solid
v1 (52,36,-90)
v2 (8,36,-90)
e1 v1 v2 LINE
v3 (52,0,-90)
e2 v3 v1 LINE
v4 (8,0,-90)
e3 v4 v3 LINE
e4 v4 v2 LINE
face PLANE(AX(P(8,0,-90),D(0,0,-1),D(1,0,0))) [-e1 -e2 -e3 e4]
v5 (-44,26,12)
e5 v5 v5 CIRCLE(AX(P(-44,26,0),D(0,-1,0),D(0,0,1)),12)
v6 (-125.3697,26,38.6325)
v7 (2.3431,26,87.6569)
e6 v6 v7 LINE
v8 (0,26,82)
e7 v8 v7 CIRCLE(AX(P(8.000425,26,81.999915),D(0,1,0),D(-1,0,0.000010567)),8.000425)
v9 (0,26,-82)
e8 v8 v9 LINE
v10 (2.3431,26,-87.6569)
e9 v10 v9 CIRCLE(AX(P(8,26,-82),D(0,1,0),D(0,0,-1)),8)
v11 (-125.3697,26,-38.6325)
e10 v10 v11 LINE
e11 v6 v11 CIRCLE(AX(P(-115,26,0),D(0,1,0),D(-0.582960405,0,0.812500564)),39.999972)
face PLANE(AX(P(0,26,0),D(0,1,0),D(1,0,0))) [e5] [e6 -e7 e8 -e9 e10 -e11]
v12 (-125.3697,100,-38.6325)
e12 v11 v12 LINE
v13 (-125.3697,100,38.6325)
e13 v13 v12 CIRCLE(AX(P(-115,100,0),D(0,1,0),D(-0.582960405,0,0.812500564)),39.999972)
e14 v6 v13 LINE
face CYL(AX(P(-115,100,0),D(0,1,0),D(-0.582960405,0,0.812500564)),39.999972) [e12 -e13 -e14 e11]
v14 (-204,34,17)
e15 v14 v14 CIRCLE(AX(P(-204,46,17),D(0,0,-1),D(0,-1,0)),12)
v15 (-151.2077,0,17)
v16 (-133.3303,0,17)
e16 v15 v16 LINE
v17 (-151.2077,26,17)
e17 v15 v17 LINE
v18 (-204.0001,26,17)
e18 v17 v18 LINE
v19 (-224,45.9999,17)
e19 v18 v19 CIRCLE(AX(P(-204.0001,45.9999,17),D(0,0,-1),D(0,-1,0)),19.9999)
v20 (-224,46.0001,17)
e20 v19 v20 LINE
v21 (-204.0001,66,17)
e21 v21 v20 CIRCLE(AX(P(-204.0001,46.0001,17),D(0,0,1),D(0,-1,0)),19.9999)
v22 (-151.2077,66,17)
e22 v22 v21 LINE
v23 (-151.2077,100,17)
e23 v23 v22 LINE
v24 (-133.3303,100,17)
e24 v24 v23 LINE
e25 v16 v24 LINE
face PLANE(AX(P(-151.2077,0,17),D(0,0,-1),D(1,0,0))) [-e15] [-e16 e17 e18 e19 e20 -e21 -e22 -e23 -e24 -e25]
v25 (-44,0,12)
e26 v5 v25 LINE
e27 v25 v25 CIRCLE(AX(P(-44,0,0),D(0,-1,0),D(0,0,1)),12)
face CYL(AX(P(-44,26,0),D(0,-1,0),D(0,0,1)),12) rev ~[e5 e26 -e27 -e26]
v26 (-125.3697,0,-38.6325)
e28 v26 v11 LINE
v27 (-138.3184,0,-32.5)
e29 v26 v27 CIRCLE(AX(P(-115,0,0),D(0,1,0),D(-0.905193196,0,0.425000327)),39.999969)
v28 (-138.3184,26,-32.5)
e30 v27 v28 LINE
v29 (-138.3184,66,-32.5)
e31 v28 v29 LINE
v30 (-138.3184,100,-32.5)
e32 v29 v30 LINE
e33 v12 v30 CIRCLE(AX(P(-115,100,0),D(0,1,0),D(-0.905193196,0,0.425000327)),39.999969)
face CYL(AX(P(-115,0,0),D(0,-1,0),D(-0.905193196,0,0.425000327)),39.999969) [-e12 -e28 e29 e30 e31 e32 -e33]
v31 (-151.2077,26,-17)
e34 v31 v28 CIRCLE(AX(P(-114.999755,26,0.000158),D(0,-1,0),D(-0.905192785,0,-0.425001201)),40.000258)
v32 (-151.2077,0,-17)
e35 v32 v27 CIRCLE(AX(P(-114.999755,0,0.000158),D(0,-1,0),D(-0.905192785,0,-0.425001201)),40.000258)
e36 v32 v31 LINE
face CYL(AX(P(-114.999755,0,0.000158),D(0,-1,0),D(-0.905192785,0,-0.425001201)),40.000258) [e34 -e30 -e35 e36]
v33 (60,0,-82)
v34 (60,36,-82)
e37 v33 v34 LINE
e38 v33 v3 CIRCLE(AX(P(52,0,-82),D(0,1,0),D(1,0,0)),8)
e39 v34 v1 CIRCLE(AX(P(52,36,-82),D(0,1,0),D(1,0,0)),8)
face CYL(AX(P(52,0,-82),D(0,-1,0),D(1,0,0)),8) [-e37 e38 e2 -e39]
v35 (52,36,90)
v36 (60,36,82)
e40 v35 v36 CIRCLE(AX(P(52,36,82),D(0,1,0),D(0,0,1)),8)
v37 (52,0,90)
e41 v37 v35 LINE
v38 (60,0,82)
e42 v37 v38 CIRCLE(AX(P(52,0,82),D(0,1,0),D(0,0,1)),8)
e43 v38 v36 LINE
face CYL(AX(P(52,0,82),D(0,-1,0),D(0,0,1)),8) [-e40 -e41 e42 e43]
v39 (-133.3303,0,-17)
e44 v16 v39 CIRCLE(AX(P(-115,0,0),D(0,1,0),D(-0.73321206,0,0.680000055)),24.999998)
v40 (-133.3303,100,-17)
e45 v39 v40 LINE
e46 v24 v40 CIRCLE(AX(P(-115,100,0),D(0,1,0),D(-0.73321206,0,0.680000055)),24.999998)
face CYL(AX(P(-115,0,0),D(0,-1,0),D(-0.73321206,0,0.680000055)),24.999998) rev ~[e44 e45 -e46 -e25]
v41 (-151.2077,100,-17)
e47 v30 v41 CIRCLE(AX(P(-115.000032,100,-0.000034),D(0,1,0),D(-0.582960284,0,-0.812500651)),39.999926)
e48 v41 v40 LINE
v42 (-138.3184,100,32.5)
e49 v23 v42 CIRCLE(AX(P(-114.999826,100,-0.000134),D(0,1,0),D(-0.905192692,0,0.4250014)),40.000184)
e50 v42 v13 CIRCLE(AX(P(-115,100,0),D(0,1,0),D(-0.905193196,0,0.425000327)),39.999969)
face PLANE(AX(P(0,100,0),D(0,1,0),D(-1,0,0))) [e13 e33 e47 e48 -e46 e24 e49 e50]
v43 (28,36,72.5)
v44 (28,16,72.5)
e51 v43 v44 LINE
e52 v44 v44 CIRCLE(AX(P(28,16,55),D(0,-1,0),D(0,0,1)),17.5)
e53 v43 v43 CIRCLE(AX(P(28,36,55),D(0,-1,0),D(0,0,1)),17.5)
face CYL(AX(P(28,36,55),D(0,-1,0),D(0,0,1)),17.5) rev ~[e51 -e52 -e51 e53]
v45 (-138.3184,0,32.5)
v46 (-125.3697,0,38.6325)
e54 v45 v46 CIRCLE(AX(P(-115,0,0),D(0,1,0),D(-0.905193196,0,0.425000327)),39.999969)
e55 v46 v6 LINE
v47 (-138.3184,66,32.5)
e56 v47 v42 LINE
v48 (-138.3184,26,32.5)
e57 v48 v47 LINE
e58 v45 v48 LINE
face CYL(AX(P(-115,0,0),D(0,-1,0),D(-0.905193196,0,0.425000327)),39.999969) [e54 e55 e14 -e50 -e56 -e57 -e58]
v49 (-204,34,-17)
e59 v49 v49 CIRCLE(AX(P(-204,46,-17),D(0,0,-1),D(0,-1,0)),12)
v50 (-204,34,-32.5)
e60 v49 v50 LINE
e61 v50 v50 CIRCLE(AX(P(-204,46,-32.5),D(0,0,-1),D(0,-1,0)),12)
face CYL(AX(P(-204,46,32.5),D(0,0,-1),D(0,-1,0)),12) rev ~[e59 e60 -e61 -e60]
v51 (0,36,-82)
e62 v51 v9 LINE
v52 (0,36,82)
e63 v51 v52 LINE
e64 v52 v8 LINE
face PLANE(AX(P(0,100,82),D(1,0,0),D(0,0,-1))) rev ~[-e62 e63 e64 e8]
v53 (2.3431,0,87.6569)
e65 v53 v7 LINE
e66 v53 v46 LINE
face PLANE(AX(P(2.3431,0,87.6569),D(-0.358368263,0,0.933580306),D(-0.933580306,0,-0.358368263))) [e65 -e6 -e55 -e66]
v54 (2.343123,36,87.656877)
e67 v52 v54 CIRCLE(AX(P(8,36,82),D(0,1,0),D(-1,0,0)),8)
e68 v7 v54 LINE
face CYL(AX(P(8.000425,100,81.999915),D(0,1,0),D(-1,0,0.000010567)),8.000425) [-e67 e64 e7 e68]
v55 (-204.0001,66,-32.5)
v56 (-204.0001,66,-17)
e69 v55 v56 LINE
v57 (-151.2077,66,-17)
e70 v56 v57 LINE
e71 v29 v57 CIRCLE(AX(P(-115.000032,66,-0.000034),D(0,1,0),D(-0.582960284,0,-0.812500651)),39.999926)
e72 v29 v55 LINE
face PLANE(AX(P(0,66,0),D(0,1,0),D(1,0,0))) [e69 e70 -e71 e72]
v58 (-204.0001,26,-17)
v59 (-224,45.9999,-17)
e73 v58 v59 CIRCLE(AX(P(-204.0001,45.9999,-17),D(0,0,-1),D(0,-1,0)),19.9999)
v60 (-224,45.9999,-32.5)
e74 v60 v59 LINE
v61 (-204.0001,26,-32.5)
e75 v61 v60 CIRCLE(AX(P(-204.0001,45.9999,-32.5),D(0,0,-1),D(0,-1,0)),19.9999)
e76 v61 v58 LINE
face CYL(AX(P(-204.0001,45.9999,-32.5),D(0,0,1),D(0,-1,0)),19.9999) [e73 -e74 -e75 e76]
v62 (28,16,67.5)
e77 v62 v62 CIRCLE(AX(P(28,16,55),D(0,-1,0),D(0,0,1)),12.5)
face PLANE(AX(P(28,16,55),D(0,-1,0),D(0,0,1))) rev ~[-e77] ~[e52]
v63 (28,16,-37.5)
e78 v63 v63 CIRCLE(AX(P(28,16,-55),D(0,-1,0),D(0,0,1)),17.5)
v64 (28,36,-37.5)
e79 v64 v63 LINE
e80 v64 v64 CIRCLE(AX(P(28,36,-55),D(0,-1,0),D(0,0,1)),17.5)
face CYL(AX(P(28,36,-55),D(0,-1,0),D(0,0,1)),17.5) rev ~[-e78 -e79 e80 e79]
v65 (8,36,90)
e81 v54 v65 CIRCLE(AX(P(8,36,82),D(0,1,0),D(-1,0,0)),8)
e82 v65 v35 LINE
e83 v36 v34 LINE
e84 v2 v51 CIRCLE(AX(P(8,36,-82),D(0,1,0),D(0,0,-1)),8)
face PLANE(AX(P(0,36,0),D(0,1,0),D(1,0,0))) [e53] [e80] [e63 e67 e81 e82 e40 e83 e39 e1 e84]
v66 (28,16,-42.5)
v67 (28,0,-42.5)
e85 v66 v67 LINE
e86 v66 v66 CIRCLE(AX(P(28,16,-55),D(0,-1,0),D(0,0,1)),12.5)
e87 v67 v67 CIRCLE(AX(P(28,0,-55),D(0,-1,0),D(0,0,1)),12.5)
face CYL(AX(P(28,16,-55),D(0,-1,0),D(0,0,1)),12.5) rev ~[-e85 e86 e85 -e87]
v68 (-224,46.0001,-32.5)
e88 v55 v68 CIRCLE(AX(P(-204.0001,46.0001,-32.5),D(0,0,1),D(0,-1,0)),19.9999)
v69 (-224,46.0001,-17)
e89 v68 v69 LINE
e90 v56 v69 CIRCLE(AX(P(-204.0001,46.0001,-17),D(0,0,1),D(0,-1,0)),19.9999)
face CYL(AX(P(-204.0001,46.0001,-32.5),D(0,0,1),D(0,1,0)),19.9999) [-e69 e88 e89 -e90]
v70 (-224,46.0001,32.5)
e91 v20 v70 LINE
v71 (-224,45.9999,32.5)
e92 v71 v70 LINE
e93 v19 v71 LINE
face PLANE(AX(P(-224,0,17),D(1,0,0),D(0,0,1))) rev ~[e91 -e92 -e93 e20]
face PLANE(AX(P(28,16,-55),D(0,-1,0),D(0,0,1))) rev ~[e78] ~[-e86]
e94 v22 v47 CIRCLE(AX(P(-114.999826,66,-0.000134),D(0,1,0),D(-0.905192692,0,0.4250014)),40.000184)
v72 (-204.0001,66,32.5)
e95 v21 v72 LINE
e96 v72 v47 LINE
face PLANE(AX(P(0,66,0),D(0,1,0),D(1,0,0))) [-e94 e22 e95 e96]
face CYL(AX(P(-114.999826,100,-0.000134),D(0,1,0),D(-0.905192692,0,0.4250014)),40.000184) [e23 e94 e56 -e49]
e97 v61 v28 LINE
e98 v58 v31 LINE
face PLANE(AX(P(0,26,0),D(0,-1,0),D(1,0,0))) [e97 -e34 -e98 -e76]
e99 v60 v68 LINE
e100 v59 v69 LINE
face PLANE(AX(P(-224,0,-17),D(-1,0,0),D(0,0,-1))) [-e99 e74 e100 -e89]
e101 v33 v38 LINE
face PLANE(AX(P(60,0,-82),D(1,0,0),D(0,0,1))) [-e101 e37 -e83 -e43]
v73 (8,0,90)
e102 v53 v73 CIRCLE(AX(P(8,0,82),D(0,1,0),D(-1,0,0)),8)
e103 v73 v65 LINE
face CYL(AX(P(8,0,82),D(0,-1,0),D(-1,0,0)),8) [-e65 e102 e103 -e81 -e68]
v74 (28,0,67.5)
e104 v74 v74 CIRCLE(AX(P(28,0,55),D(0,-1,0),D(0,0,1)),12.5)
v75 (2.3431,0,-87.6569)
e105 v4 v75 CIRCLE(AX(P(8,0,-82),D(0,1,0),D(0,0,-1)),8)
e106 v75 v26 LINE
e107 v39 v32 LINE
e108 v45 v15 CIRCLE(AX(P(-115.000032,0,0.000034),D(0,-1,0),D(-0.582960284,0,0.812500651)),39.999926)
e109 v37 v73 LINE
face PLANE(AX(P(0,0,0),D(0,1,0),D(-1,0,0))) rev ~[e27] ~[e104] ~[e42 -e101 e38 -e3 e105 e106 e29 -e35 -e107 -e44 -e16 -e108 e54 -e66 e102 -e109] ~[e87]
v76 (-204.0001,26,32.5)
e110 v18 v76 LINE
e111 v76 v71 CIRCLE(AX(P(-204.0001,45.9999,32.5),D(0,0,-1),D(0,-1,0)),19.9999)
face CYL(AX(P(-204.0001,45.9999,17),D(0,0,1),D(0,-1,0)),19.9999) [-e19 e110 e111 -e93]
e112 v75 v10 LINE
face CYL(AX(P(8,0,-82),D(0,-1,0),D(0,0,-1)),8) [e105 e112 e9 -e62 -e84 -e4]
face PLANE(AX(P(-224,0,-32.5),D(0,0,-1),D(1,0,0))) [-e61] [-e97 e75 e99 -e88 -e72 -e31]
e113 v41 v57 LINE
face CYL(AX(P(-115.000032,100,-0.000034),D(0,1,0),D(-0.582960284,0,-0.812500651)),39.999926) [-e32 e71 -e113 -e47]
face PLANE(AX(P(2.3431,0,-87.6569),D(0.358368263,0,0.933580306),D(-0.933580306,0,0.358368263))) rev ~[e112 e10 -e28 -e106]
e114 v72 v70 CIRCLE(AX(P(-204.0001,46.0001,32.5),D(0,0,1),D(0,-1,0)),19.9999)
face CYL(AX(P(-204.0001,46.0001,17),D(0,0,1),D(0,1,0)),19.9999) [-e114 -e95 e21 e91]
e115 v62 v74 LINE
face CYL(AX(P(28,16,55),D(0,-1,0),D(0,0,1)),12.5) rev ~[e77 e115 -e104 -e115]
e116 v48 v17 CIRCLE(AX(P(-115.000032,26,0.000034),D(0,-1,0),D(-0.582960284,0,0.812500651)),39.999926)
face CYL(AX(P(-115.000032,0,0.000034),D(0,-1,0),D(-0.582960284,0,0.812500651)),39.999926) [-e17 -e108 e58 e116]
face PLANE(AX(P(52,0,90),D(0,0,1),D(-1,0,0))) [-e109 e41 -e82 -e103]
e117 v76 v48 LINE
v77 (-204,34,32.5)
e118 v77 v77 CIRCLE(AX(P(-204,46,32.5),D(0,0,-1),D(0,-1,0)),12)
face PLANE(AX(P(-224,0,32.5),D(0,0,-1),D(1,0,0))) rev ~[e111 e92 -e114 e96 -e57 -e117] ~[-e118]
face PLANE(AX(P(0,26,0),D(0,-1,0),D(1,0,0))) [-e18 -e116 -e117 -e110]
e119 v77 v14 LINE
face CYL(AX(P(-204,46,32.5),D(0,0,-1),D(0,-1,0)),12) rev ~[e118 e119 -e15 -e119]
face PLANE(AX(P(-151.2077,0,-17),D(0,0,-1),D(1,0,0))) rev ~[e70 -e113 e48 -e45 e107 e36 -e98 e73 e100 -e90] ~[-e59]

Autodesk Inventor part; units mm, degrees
ref_plane "YZ Plane" through (0, 0, 0) normal (1, 0, 0) x (0, 1, 0)
ref_plane "XZ Plane" through (0, 0, 0) normal (0, 1, 0) x (-1, 0, 0)
ref_plane "XY Plane" through (0, 0, 0) normal (0, 0, 1) x (1, 0, 0)
sketch "Szkic1" plane through (0, 0, 0) normal (0, 1, 0) x (-1, 0, 0)
  line L0 (-8, -90) -> (-52, -90)
  line L1 (-60, -82) -> (-60, 82)
  line L2 (-52, 90) -> (-8, 90)
  line L3 (0, 82) -> (0, -82)
  arc A0 (-8, -90) -> (0, -82) centre (-8, -82) ccw
  arc A1 (-60, -82) -> (-52, -90) centre (-52, -82) ccw
  arc A2 (0, 82) -> (-8, 90) centre (-8, 82) ccw
  arc A3 (-52, 90) -> (-60, 82) centre (-52, 82) ccw
  line L4 (-2.3431, -87.6569) -> (125.3697, -38.6325)
  line L5 (-2.3431, -87.6569) -> (134.4558, -87.6569) construction
  line L6 (-2.3431, 87.6569) -> (125.3697, 38.6325)
  line L7 (-2.3431, 87.6569) -> (134.4558, 87.6569) construction
  line L8 (193.533, -17) -> (224, -17)
  line L9 (224, 17) -> (193.533, 17)
  line L10 (193.533, -17) -> (133.3303, -17)
  line L11 (193.533, 17) -> (133.3303, 17)
  line L12 (224, -17) -> (224, -32.5)
  line L13 (224, 17) -> (224, 32.5)
  line L14 (224, 32.5) -> (138.3184, 32.5)
  line L15 (224, -32.5) -> (138.3184, -32.5)
  arc A4 (133.3303, 17) -> (133.3303, -17) centre (115, 0) ccw
  arc A5 (151.2077, 17) -> (151.2077, -17) centre (115, 0) ccw
  point P0 (0, 0)
  point P1 (-60, 90)
  point P2 (-60, -90)
  point P3 (0, 90)
  point P4 (-30, 0)
  point P5 (125.3697, 38.6325)
  dimension "d0" = 60
  dimension "d1" = 180
  dimension "d2" = 8
  dimension "d5" = 21
  dimension "d6" = 21
  dimension "d9" = 15.5
  dimension "d10" = 15.5
extrude "Wyciągnięcie proste1" add sketch "Szkic1" along normal blind 100
sketch "Szkic2" plane through (0, 100, 0) normal (0, 1, 0) x (1, 0, 0)
  line L0 (8, -90) -> (52, -90)
  line L1 (60, -82) -> (60, 82)
  line L2 (52, 90) -> (8, 90)
  line L3 (0, 82) -> (0, -82)
  arc A0 (0, -82) -> (8, -90) centre (8, -82) ccw
  arc A1 (8, 90) -> (0, 82) centre (8, 82) ccw
  arc A2 (60, 82) -> (52, 90) centre (52, 82) ccw
  arc A3 (52, -90) -> (60, -82) centre (52, -82) ccw
  point P0 (0, 0)
  dimension "d13" = 8
extrude "Wyciągnięcie proste2" cut sketch "Szkic2" against normal blind 64
sketch "Szkic3" plane through (0, 100, 0) normal (0, 1, 0) x (1, 0, 0)
  arc A0 (-138.3184, -32.5) -> (-125.3697, -38.6325) centre (-115, 0) ccw projected
  arc A1 (-125.3697, 38.6325) -> (-138.3184, 32.5) centre (-115, 0) ccw projected
  arc A2 (-138.3184, -32.5) -> (-138.3184, 32.5) centre (-115, 0) ccw
  line L0 (-125.3697, -38.6325) -> (2.3431, -87.6569) projected
  line L1 (-125.3697, -38.6325) -> (2.3431, -87.6569)
  line L2 (2.3431, 87.6569) -> (-125.3697, 38.6325) projected
  line L3 (-125.3697, 38.6325) -> (2.3431, 87.6569)
  line L4 (0, -82) -> (0, 82) projected
  line L5 (0, -82) -> (0, 82)
  arc A3 (0, -82) -> (2.3431, -87.6569) centre (8, -82) ccw projected
  arc A4 (0, -82) -> (2.3431, -87.6569) centre (8, -82) ccw
  arc A5 (8, 90) -> (2.3431, 87.6569) centre (8, 82) ccw projected
  arc A6 (8, 90) -> (0, 82) centre (8, 82) ccw
  point P0 (0, 0)
  point P1 (-125.3697, 38.6325)
  point P2 (-125.3697, -38.6325)
extrude "Wyciągnięcie proste3" cut sketch "Szkic3" against normal blind 74
sketch "Szkic4" plane through (0, 0, 0) normal (0, -1, 0) x (1, 0, 0)
  line L0 (-224, 32.5) -> (-138.3184, 32.5) projected
  line L1 (-224, 32.5) -> (-138.3184, 32.5)
  line L2 (-224, 17) -> (-224, 32.5) projected
  line L3 (-224, 32.5) -> (-224, 17)
  arc A0 (-125.3697, 38.6325) -> (-138.3184, 32.5) centre (-115, 0) ccw projected
  arc A1 (-138.3184, 32.5) -> (-151.2077, 17) centre (-115, 0) ccw
  line L4 (-133.3303, 17) -> (-224, 17) projected
  line L5 (-224, 17) -> (-151.2077, 17)
  arc A2 (-138.3184, -32.5) -> (-125.3697, -38.6325) centre (-115, 0) ccw projected
  arc A3 (-151.2077, -17) -> (-137.5648, -33.0277) centre (-115, 0) ccw
  line L6 (-224, -17) -> (-133.3303, -17) projected
  line L7 (-151.2077, -17) -> (-224, -17)
  line L8 (-224, -32.5) -> (-224, -17) projected
  line L9 (-224, -17) -> (-224, -32.5)
  line L10 (-224, -32.5) -> (-138.3184, -32.5)
  point P0 (0, 0)
  point P1 (-138.3184, -32.5)
  dimension "d18" = 40
extrude "Wyciągnięcie proste4" cut sketch "Szkic4" against normal blind 26
sketch "Szkic5" plane through (0, 100, 0) normal (0, 1, 0) x (1, 0, 0)
  arc A0 (-138.3184, 32.5) -> (-151.2077, 17) centre (-115, 0) ccw projected
  arc A1 (-138.3184, 32.5) -> (-151.2077, 17) centre (-115, 0) ccw
  arc A2 (-151.2077, -17) -> (-125.3697, -38.6325) centre (-115, 0) ccw projected
  line L0 (-224, -32.5) -> (-138.3184, -32.5) projected
  arc A3 (-151.2077, -17) -> (-138.3184, -32.5) centre (-115, 0) ccw
  line L1 (-138.3184, 32.5) -> (-224, 32.5) projected
  line L2 (-138.3184, 32.5) -> (-224, 32.5)
  line L3 (-224, 32.5) -> (-224, 17) projected
  line L4 (-224, 32.5) -> (-224, 17)
  line L5 (-224, 17) -> (-151.2077, 17)
  line L6 (-133.3303, -17) -> (-224, -17) projected
  line L7 (-151.2077, -17) -> (-224, -17)
  line L8 (-224, -17) -> (-224, -32.5) projected
  line L9 (-224, -17) -> (-224, -32.5)
  line L10 (-224, -32.5) -> (-138.3184, -32.5)
  point P0 (0, 0)
extrude "Wyciągnięcie proste5" cut sketch "Szkic5" against normal blind 34
sketch "Szkic6" plane through (-224, 26, 32.5) normal (0, 0, 1) x (1, 0, 0)
  point P0 (224, -26)
sketch "Szkic7" plane through (0, 36, 0) normal (0, 1, 0) x (1, 0, 0)
  line L0 (8, 90) -> (52, 90) projected
  line L1 (60, 82) -> (60, -82) projected
  point P0 (0, 0)
  point P1 (28, 55)
  point P2 (30, 90)
  point P3 (28, -55)
  dimension "d23" = 35
  dimension "d24" = 32
sketch "Szkic8" plane through (0, 26, 0) normal (0, 1, 0) x (1, 0, 0)
  point P0 (0, 0)
  point P1 (44, 0)
  point P2 (44, 0)
  point P3 (-44, 0)
hole "Otwór1" at (-44, 26, 0) direction (0, -1, 0) diameter 24 end through all
hole "Otwór2" at (28, 36, -55) at (28, 36, 55) direction (0, -1, 0) diameter 25 end through all counterbore diameter 35 counterbore depth 20
sketch "Szkic9" plane through (-224, 26, 32.5) normal (0, 0, 1) x (1, 0, 0)
  point P0 (224, -26)
sketch "Szkic10" plane through (-224, 26, 32.5) normal (0, 0, 1) x (1, 0, 0)
  point P0 (224, -26)
  point P1 (20, 20)
hole "Otwór3" at (-204, 46, 32.5) direction (0, 0, -1) diameter 24 end through all
full round fillet "Zaokrąglenie pełne1" first side at (-199.7359, 66, -22.1667) centre faces at (-224, 39.3333, -27.3333) second side at (-199.7359, 26, -22.1667)
full round fillet "Zaokrąglenie pełne2" first side at (-199.7359, 66, 22.1667) centre faces at (-224, 39.3333, 22.1667) second side at (-199.7359, 26, 22.1667)
